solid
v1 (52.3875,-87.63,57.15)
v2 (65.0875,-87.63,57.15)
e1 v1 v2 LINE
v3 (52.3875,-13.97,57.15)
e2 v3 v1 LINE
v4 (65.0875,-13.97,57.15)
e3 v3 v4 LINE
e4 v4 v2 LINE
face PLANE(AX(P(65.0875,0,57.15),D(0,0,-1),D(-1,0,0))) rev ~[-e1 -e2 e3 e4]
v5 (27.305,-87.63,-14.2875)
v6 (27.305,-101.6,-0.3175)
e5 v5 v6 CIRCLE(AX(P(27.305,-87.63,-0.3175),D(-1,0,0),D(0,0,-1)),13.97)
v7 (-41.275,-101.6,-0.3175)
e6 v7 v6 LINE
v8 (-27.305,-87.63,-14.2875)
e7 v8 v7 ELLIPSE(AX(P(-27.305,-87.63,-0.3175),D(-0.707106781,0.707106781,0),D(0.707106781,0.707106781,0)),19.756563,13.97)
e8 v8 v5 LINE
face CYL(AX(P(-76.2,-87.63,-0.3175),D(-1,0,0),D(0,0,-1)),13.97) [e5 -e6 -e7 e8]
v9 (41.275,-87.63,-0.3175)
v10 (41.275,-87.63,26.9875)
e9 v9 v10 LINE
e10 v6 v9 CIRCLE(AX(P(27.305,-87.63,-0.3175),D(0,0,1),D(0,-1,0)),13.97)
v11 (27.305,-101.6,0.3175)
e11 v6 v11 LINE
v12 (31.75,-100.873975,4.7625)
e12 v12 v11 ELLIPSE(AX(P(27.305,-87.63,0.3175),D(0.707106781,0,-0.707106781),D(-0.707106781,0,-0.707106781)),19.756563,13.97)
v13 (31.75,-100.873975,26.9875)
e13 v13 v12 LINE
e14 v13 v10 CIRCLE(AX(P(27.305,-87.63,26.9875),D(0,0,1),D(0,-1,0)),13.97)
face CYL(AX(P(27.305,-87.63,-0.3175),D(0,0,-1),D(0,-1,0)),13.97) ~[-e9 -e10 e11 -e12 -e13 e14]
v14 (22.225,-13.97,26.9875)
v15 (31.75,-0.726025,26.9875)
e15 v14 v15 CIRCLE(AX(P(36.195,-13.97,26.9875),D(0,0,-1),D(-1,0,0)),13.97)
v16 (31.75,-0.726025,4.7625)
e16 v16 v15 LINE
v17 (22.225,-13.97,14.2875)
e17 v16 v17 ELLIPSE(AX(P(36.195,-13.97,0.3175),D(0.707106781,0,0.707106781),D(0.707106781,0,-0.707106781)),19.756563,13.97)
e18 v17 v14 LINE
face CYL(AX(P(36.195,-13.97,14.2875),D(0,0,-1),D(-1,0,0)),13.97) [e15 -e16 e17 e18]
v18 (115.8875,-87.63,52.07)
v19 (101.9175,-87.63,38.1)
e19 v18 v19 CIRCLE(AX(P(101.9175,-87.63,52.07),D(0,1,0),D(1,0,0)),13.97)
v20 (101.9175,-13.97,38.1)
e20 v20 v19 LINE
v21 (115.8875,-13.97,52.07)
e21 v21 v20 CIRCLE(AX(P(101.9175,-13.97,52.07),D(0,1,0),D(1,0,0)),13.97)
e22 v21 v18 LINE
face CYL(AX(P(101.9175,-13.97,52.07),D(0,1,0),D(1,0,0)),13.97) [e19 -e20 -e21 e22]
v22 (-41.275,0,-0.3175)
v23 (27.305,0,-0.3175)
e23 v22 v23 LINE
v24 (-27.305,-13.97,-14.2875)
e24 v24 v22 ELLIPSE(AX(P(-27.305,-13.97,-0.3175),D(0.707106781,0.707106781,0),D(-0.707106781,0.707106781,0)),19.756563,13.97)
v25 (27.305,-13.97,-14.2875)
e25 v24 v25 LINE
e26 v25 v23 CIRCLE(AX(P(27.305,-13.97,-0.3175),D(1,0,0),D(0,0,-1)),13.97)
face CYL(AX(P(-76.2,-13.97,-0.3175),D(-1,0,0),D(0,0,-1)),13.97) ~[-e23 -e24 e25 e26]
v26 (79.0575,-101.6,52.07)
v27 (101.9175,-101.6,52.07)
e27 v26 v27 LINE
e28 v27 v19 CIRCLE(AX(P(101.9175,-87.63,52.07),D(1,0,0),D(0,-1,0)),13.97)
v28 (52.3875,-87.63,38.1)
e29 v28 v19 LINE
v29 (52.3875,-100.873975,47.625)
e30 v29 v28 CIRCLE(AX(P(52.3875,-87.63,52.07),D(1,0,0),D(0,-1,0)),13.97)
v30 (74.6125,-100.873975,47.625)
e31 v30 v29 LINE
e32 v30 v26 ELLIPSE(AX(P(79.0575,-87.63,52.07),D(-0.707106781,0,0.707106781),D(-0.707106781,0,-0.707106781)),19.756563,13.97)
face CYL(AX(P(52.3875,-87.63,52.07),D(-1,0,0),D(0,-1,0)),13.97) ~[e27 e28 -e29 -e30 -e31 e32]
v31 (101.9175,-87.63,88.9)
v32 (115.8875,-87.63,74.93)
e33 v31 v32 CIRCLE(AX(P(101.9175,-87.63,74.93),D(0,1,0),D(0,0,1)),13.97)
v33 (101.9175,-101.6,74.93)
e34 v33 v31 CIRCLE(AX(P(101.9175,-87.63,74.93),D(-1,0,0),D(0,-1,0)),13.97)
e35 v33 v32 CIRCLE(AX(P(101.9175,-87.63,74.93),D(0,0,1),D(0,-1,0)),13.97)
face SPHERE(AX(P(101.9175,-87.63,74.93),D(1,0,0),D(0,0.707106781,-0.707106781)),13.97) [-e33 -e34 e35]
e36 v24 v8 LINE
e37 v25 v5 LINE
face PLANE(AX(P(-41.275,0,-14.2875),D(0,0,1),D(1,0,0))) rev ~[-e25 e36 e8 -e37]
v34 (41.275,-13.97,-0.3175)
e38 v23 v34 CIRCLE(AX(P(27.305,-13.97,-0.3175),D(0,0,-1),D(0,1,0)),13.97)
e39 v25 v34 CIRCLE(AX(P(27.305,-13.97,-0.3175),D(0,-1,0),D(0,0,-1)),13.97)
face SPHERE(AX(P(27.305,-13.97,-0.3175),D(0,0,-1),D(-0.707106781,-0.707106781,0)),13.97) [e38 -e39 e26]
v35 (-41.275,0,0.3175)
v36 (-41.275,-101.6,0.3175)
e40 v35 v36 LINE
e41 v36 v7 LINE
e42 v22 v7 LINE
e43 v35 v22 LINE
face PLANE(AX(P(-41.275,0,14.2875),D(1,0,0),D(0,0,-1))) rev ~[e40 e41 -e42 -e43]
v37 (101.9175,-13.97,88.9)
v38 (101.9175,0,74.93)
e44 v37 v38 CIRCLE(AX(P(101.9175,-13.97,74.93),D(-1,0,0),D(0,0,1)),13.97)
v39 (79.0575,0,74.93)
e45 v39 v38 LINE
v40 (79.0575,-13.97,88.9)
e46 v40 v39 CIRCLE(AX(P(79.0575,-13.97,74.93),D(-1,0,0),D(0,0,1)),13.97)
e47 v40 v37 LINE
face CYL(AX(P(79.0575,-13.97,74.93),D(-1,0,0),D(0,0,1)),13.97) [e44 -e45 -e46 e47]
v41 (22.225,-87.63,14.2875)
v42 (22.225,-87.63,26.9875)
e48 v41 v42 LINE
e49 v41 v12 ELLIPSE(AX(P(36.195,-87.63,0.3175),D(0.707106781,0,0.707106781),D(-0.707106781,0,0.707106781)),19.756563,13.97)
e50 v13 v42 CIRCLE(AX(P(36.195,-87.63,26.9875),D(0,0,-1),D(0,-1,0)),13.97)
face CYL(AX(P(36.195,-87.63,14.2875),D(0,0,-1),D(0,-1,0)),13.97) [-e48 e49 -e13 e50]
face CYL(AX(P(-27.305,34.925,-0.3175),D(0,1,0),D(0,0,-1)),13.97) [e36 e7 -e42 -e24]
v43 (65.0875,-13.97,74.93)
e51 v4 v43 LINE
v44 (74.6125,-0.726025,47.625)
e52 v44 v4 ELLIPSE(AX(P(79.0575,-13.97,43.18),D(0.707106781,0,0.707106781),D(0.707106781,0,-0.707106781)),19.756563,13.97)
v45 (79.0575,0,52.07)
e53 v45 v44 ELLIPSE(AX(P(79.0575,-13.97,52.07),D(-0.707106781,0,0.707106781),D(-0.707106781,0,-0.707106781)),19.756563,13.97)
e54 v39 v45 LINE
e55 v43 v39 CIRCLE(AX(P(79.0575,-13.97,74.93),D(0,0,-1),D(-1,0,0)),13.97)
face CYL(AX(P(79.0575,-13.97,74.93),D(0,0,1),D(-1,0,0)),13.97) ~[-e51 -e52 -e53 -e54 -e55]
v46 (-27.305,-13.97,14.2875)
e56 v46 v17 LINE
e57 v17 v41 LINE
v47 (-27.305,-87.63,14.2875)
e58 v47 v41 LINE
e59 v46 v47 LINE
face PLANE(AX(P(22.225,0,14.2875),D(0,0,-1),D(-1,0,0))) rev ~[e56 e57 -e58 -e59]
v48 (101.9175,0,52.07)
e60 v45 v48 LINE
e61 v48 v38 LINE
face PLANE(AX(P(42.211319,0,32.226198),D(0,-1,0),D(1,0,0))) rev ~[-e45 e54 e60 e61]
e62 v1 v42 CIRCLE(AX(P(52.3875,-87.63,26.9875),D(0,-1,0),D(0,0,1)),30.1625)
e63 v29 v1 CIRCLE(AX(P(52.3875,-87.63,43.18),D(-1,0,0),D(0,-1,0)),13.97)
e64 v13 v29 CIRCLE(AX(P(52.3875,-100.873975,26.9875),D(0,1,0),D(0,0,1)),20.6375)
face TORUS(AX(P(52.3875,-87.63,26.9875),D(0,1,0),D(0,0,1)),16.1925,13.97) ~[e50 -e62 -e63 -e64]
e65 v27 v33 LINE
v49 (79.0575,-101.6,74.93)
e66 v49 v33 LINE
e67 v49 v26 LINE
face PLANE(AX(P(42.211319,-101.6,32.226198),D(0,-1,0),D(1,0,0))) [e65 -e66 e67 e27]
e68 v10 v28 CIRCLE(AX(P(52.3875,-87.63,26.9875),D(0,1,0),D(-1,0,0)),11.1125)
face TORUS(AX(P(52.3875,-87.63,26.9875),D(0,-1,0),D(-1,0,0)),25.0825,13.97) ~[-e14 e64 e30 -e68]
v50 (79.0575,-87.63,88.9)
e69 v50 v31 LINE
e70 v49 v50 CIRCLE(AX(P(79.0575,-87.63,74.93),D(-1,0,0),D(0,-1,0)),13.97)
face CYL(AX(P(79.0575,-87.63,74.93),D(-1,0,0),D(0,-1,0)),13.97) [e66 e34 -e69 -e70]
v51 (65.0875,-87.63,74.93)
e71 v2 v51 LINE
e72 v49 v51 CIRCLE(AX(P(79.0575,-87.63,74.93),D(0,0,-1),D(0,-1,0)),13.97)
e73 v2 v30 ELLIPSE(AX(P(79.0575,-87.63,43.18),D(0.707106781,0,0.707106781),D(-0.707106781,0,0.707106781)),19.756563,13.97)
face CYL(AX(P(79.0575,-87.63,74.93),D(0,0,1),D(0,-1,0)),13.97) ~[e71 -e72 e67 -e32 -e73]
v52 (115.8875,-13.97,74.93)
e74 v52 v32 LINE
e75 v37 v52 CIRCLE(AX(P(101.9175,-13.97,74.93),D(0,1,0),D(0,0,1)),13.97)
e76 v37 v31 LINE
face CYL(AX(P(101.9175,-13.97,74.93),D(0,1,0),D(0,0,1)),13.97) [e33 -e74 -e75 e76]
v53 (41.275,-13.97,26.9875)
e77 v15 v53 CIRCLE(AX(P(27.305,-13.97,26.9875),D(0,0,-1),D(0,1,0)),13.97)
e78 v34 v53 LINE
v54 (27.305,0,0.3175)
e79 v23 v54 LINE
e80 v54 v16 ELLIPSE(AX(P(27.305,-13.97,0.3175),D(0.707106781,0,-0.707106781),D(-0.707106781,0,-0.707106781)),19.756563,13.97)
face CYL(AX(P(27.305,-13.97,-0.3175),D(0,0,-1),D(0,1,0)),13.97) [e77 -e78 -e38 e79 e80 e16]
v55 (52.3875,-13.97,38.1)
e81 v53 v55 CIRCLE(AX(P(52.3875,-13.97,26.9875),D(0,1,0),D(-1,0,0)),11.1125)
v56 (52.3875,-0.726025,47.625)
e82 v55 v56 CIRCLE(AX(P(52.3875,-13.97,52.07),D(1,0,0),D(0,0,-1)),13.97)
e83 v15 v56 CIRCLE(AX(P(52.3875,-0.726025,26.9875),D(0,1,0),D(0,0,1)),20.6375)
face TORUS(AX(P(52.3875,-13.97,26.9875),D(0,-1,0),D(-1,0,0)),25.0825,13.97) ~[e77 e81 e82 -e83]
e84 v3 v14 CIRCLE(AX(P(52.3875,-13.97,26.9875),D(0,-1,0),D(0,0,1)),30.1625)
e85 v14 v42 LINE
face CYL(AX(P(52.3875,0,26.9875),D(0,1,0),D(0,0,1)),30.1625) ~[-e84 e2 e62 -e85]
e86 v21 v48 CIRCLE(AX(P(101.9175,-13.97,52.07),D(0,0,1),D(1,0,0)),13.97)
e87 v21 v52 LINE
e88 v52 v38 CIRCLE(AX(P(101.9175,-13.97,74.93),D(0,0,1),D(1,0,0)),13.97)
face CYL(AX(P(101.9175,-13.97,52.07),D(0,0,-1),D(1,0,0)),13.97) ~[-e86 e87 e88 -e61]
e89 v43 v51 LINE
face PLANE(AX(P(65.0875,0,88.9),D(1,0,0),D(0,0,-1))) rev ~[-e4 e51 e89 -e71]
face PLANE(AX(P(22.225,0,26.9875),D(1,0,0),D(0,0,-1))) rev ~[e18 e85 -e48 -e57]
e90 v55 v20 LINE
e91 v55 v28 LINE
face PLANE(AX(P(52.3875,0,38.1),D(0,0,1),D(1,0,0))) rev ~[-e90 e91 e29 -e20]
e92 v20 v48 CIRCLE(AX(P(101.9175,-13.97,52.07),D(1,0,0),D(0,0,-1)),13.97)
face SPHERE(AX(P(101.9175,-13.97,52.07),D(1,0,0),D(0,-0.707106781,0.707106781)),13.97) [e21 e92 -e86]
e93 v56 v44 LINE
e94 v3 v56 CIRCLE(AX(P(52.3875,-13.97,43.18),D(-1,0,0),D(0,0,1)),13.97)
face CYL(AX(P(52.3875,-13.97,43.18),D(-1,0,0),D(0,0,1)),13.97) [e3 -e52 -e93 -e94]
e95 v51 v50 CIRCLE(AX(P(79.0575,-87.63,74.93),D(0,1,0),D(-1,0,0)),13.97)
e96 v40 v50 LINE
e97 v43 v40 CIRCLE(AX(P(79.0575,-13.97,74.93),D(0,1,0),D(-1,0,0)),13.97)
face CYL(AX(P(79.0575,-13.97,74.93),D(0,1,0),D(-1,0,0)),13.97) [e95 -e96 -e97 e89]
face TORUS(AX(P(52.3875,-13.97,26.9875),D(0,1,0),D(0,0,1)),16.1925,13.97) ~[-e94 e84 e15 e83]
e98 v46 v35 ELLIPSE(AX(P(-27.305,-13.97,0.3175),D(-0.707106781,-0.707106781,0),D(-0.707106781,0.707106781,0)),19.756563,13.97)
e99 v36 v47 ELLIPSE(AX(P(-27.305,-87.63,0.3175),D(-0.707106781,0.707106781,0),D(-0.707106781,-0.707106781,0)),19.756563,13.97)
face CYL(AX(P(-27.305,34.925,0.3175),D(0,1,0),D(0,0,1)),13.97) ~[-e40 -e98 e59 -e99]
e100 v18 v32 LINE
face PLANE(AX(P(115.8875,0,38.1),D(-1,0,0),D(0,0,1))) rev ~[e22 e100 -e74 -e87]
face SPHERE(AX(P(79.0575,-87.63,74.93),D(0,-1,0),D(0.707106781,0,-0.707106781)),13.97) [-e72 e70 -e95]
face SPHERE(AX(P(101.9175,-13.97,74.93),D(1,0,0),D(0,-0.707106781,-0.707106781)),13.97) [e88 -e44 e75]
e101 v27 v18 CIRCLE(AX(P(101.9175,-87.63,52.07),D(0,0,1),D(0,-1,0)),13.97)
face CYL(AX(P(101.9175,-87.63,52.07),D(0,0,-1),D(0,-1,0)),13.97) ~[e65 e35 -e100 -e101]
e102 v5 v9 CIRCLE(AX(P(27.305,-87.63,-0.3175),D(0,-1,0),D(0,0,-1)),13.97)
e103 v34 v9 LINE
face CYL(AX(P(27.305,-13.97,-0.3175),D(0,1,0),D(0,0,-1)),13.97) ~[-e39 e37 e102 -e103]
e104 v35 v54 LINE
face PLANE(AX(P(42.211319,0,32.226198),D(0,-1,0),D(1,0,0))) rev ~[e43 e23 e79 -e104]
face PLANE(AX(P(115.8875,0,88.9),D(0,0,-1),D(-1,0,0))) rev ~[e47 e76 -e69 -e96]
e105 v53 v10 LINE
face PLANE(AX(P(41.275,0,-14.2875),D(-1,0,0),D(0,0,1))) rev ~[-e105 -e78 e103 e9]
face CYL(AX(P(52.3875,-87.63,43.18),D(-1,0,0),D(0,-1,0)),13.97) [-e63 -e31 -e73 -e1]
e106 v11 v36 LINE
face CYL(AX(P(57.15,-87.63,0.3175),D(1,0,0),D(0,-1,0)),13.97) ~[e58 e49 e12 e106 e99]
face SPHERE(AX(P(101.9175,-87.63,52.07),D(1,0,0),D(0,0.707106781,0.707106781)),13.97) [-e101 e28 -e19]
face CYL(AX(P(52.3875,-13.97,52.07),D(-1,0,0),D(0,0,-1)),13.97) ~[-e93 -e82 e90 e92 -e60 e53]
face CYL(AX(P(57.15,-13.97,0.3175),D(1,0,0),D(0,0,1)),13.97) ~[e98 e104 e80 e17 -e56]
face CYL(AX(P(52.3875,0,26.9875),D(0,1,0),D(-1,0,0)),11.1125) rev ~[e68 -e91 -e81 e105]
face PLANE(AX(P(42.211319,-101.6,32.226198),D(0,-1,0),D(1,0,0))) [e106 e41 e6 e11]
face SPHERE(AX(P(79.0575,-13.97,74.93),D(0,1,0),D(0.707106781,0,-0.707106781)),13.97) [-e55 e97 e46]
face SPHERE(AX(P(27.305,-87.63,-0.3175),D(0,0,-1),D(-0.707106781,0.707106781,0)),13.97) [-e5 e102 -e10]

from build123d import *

# Parameters (mm, degrees)
F1_DEPTH      = 101.6
F2_T1_DEPTH   = 22.86
F2_T3_DEPTH   = 17.78
F2_T5_DEPTH   = 73.66
F2_T7_DEPTH   = 22.86
F2_T9_DEPTH   = 49.53
F2_T11_DEPTH  = 12.7
F2_T13_DEPTH  = 98.425
F2_T15_DEPTH  = 171.45
F2_T17_DEPTH  = 103.505
F2_T19_DEPTH  = 12.7
F2_T21_DEPTH  = 27.305
F2_S25_W      = 13.97
F2_S25_H      = 13.97
F2_T26_DEPTH  = 13.97
F2_S31_W      = 13.97
F2_S31_H      = 13.97
F2_T32_DEPTH  = 13.97
F2_S37_W      = 13.97
F2_S37_H      = 13.97
F2_T38_DEPTH  = 13.97
F2_S43_W      = 13.97
F2_S43_H      = 13.97
F2_T44_DEPTH  = 13.97
F2_S49_W      = 13.97
F2_S49_H      = 13.97
F2_T50_DEPTH  = 13.97
F2_S55_W      = 13.97
F2_S55_H      = 13.97
F2_T56_DEPTH  = 13.97
F2_S61_W      = 13.97
F2_S61_H      = 13.97
F2_T62_DEPTH  = 13.97
F2_S67_W      = 13.97
F2_S67_H      = 13.97
F2_T68_DEPTH  = 13.97
F2_T72_ANGLE  = 90
F2_T74_ANGLE  = 90
F2_T76_ANGLE  = 90
F2_T78_ANGLE  = 90
F2_T83_DEPTH  = 52.705
F2_T87_DEPTH  = 47.625
F2_T94_DEPTH  = 47.625
F2_T98_DEPTH  = 52.705
F2_T105_DEPTH = 47.625
F2_T109_DEPTH = 133.35
F2_T116_DEPTH = 133.35
F2_T120_DEPTH = 47.625


# Not quite as in the source:
# - a fillet or chamfer that OpenCascade refuses, or shapes differently, is made with other operations: its cross-section is extruded or revolved along the edge and cut away or added


with BuildPart() as f1:
    # F0 (on Front) → F1 (new body)
    with BuildSketch(Plane.XZ):
        with BuildLine():
            Line((-41.275, -14.2875), (41.275, -14.2875))
            Line((41.275, -14.2875), (41.275, 14.2875))
            Line((41.275, 14.2875), (41.275, 26.9875))
            ThreePointArc((41.275, 26.9875), (44.5297758941, 34.8452241059), (52.3875, 38.1))
            Line((52.3875, 38.1), (65.0875, 38.1))
            Line((65.0875, 38.1), (115.8875, 38.1))
            Line((115.8875, 38.1), (115.8875, 88.9))
            Line((115.8875, 88.9), (65.0875, 88.9))
            Line((65.0875, 88.9), (65.0875, 57.15))
            Line((65.0875, 57.15), (52.3875, 57.15))
            ThreePointArc((52.3875, 57.15), (31.0593917125, 48.3156082875), (22.225, 26.9875))
            Line((22.225, 26.9875), (22.225, 14.2875))
            Line((22.225, 14.2875), (-41.275, 14.2875))
            Line((-41.275, 14.2875), (-41.275, -14.2875))
        make_face()
    extrude(amount=F1_DEPTH)

    # F2: fillet of radius 13.97 on 20 edges, made by hand

    # F2_s2 → F2_t1 (cut)
    with BuildSketch(Plane.YZ.offset(79.0575)):
        with BuildLine():
            ThreePointArc((-101.6, 74.93), (-97.5082817332, 84.8082817332), (-87.63, 88.9))
            Line((-87.63, 88.9), (-101.6, 88.9))
            Line((-101.6, 88.9), (-101.6, 74.93))
        make_face()
        with BuildLine():
            ThreePointArc((-13.97, 88.9), (-4.0917182668, 84.8082817332), (0, 74.93))
            Line((0, 74.93), (0, 88.9))
            Line((0, 88.9), (-13.97, 88.9))
        make_face()
    extrude(amount=F2_T1_DEPTH, mode=Mode.SUBTRACT)

    # F2_s4 → F2_t3 (cut)
    with BuildSketch(Plane.XY.offset(57.15)):
        with BuildLine():
            ThreePointArc((79.0575, -101.6), (69.1792182668, -97.5082817332), (65.0875, -87.63))
            Line((65.0875, -87.63), (65.0875, -101.6))
            Line((65.0875, -101.6), (79.0575, -101.6))
        make_face()
        with BuildLine():
            ThreePointArc((65.0875, -13.97), (69.1792182668, -4.0917182668), (79.0575, 0))
            Line((79.0575, 0), (65.0875, 0))
            Line((65.0875, 0), (65.0875, -13.97))
        make_face()
    extrude(amount=F2_T3_DEPTH, mode=Mode.SUBTRACT)

    # F2_s6 → F2_t5 (cut)
    with BuildSketch(Plane.XZ.offset(13.97)):
        with BuildLine():
            ThreePointArc((101.9175, 88.9), (111.7957817332, 84.8082817332), (115.8875, 74.93))
            Line((115.8875, 74.93), (115.8875, 88.9))
            Line((115.8875, 88.9), (101.9175, 88.9))
        make_face()
        with BuildLine():
            ThreePointArc((65.0875, 74.93), (69.1792182668, 84.8082817332), (79.0575, 88.9))
            Line((79.0575, 88.9), (65.0875, 88.9))
            Line((65.0875, 88.9), (65.0875, 74.93))
        make_face()
        with BuildLine():
            ThreePointArc((115.8875, 52.07), (111.7957817332, 42.1917182668), (101.9175, 38.1))
            Line((101.9175, 38.1), (115.8875, 38.1))
            Line((115.8875, 38.1), (115.8875, 52.07))
        make_face()
        with BuildLine():
            ThreePointArc((27.305, -14.2875), (37.1832817332, -10.1957817332), (41.275, -0.3175))
            Line((41.275, -0.3175), (41.275, -14.2875))
            Line((41.275, -14.2875), (27.305, -14.2875))
        make_face()
    extrude(amount=F2_T5_DEPTH, mode=Mode.SUBTRACT)

    # F2_s8 → F2_t7 (cut)
    with BuildSketch(Plane.XY.offset(52.07)):
        with BuildLine():
            ThreePointArc((101.9175, -101.6), (111.7957817332, -97.5082817332), (115.8875, -87.63))
            Line((115.8875, -87.63), (115.8875, -101.6))
            Line((115.8875, -101.6), (101.9175, -101.6))
        make_face()
        with BuildLine():
            ThreePointArc((115.8875, -13.97), (111.7957817332, -4.0917182668), (101.9175, 0))
            Line((101.9175, 0), (115.8875, 0))
            Line((115.8875, 0), (115.8875, -13.97))
        make_face()
    extrude(amount=F2_T7_DEPTH, mode=Mode.SUBTRACT)

    # F2_s10 → F2_t9 (cut)
    with BuildSketch(Plane.YZ.offset(52.3875)):
        with BuildLine():
            ThreePointArc((-101.6, 52.07), (-97.5082817332, 42.1917182668), (-87.63, 38.1))
            Line((-87.63, 38.1), (-101.6, 38.1))
            Line((-101.6, 38.1), (-101.6, 52.07))
        make_face()
        with BuildLine():
            ThreePointArc((-13.97, 38.1), (-4.0917182668, 42.1917182668), (0, 52.07))
            Line((0, 52.07), (0, 38.1))
            Line((0, 38.1), (-13.97, 38.1))
        make_face()
    extrude(amount=F2_T9_DEPTH, mode=Mode.SUBTRACT)

    # F2_s12 → F2_t11 (cut)
    with BuildSketch(Plane.XY.offset(14.2875)):
        with BuildLine():
            ThreePointArc((36.195, -101.6), (26.3167182668, -97.5082817332), (22.225, -87.63))
            Line((22.225, -87.63), (22.225, -101.6))
            Line((22.225, -101.6), (36.195, -101.6))
        make_face()
        with BuildLine():
            ThreePointArc((22.225, -13.97), (26.3167182668, -4.0917182668), (36.195, 0))
            Line((36.195, 0), (22.225, 0))
            Line((22.225, 0), (22.225, -13.97))
        make_face()
    extrude(amount=F2_T11_DEPTH, mode=Mode.SUBTRACT)

    # F2_s14 → F2_t13 (cut)
    with BuildSketch(Plane.YZ.offset(-76.2)):
        with BuildLine():
            ThreePointArc((-101.6, 0.3175), (-97.5082817332, 10.1957817332), (-87.63, 14.2875))
            Line((-87.63, 14.2875), (-101.6, 14.2875))
            Line((-101.6, 14.2875), (-101.6, 0.3175))
        make_face()
        with BuildLine():
            ThreePointArc((-13.97, 14.2875), (-4.0917182668, 10.1957817332), (0, 0.3175))
            Line((0, 0.3175), (0, 14.2875))
            Line((0, 14.2875), (-13.97, 14.2875))
        make_face()
    extrude(amount=F2_T13_DEPTH, mode=Mode.SUBTRACT)

    # F2_s16 → F2_t15 (cut)
    with BuildSketch(Plane.XZ.offset(-34.925)):
        with BuildLine():
            ThreePointArc((-27.305, 14.2875), (-37.1832817332, 10.1957817332), (-41.275, 0.3175))
            Line((-41.275, 0.3175), (-41.275, 14.2875))
            Line((-41.275, 14.2875), (-27.305, 14.2875))
        make_face()
        with BuildLine():
            ThreePointArc((-27.305, -14.2875), (-37.1832817332, -10.1957817332), (-41.275, -0.3175))
            Line((-41.275, -0.3175), (-41.275, -14.2875))
            Line((-41.275, -14.2875), (-27.305, -14.2875))
        make_face()
    extrude(amount=F2_T15_DEPTH, mode=Mode.SUBTRACT)

    # F2_s18 → F2_t17 (cut)
    with BuildSketch(Plane.YZ.offset(-76.2)):
        with BuildLine():
            ThreePointArc((-13.97, -14.2875), (-4.0917182668, -10.1957817332), (0, -0.3175))
            Line((0, -0.3175), (0, -14.2875))
            Line((0, -14.2875), (-13.97, -14.2875))
        make_face()
        with BuildLine():
            ThreePointArc((-87.63, -14.2875), (-97.5082817332, -10.1957817332), (-101.6, -0.3175))
            Line((-101.6, -0.3175), (-101.6, -14.2875))
            Line((-101.6, -14.2875), (-87.63, -14.2875))
        make_face()
    extrude(amount=F2_T17_DEPTH, mode=Mode.SUBTRACT)

    # F2_s20 → F2_t19 (cut)
    with BuildSketch(Plane.YZ.offset(52.3875)):
        with BuildLine():
            ThreePointArc((-13.97, 57.15), (-4.0917182668, 53.0582817332), (0, 43.18))
            Line((0, 43.18), (0, 57.15))
            Line((0, 57.15), (-13.97, 57.15))
        make_face()
        with BuildLine():
            ThreePointArc((-101.6, 43.18), (-97.5082817332, 53.0582817332), (-87.63, 57.15))
            Line((-87.63, 57.15), (-101.6, 57.15))
            Line((-101.6, 57.15), (-101.6, 43.18))
        make_face()
    extrude(amount=F2_T19_DEPTH, mode=Mode.SUBTRACT)

    # F2_s22 → F2_t21 (cut)
    with BuildSketch(Plane.XY.offset(-0.3175)):
        with BuildLine():
            ThreePointArc((27.305, 0), (37.1832817332, -4.0917182668), (41.275, -13.97))
            Line((41.275, -13.97), (41.275, 0))
            Line((41.275, 0), (27.305, 0))
        make_face()
        with BuildLine():
            ThreePointArc((27.305, -101.6), (37.1832817332, -97.5082817332), (41.275, -87.63))
            Line((41.275, -87.63), (41.275, -101.6))
            Line((41.275, -101.6), (27.305, -101.6))
        make_face()
    extrude(amount=F2_T21_DEPTH, mode=Mode.SUBTRACT)


with BuildPart() as f2_tool24:
    # F2_s25 → F2_t26 (new body)
    with BuildSketch(Plane.YZ.offset(101.9175)):
        with Locations((-94.615, 81.915)):
            Rectangle(F2_S25_W, F2_S25_H)
    extrude(amount=F2_T26_DEPTH)

    # F2_s27 → F2_t28 (revolve, cut)
    with BuildSketch(Plane(origin=(101.9175, -87.63, 74.93), x_dir=(0, 0.7071067812, -0.7071067812), z_dir=(0, -0.7071067812, -0.7071067812))):
        with BuildLine():
            ThreePointArc((0, -13.97), (13.97, 0), (0, 13.97))
            Line((0, 13.97), (0, -13.97))
        make_face()
    revolve(axis=Axis((101.9175, -87.63, 74.93), (1, 0, 0)), mode=Mode.SUBTRACT)


with BuildPart() as f1_1:
    add(f1.part)

    # F2_t23: cut F2_tool24
    add(f2_tool24.part, mode=Mode.SUBTRACT)


with BuildPart() as f2_tool30:
    # F2_s31 → F2_t32 (new body)
    with BuildSketch(Plane.XZ.offset(87.63)):
        with Locations((72.0725, 81.915)):
            Rectangle(F2_S31_W, F2_S31_H)
    extrude(amount=F2_T32_DEPTH)

    # F2_s33 → F2_t34 (revolve, cut)
    with BuildSketch(Plane(origin=(79.0575, -87.63, 74.93), x_dir=(0.7071067812, 0, -0.7071067812), z_dir=(-0.7071067812, 0, -0.7071067812))):
        with BuildLine():
            ThreePointArc((0, -13.97), (13.97, 0), (0, 13.97))
            Line((0, 13.97), (0, -13.97))
        make_face()
    revolve(axis=Axis((79.0575, -87.63, 74.93), (0, -1, 0)), mode=Mode.SUBTRACT)


with BuildPart() as f1_2:
    add(f1_1.part)

    # F2_t29: cut F2_tool30
    add(f2_tool30.part, mode=Mode.SUBTRACT)


with BuildPart() as f2_tool36:
    # F2_s37 → F2_t38 (new body)
    with BuildSketch(Plane.YZ.offset(101.9175)):
        with Locations((-6.985, 81.915)):
            Rectangle(F2_S37_W, F2_S37_H)
    extrude(amount=F2_T38_DEPTH)

    # F2_s39 → F2_t40 (revolve, cut)
    with BuildSketch(Plane(origin=(101.9175, -13.97, 74.93), x_dir=(0, -0.7071067812, -0.7071067812), z_dir=(0, -0.7071067812, 0.7071067812))):
        with BuildLine():
            ThreePointArc((0, -13.97), (13.97, 0), (0, 13.97))
            Line((0, 13.97), (0, -13.97))
        make_face()
    revolve(axis=Axis((101.9175, -13.97, 74.93), (1, 0, 0)), mode=Mode.SUBTRACT)


with BuildPart() as f1_3:
    add(f1_2.part)

    # F2_t35: cut F2_tool36
    add(f2_tool36.part, mode=Mode.SUBTRACT)


with BuildPart() as f2_tool42:
    # F2_s43 → F2_t44 (new body)
    with BuildSketch(Plane.XZ.offset(13.97)):
        with Locations((72.0725, 81.915)):
            Rectangle(F2_S43_W, F2_S43_H)
    extrude(amount=-F2_T44_DEPTH)

    # F2_s45 → F2_t46 (revolve, cut)
    with BuildSketch(Plane(origin=(79.0575, -13.97, 74.93), x_dir=(0.7071067812, 0, -0.7071067812), z_dir=(0.7071067812, 0, 0.7071067812))):
        with BuildLine():
            ThreePointArc((0, -13.97), (13.97, 0), (0, 13.97))
            Line((0, 13.97), (0, -13.97))
        make_face()
    revolve(axis=Axis((79.0575, -13.97, 74.93), (0, 1, 0)), mode=Mode.SUBTRACT)


with BuildPart() as f1_4:
    add(f1_3.part)

    # F2_t41: cut F2_tool42
    add(f2_tool42.part, mode=Mode.SUBTRACT)


with BuildPart() as f2_tool48:
    # F2_s49 → F2_t50 (new body)
    with BuildSketch(Plane.YZ.offset(101.9175)):
        with Locations((-94.615, 45.085)):
            Rectangle(F2_S49_W, F2_S49_H)
    extrude(amount=F2_T50_DEPTH)

    # F2_s51 → F2_t52 (revolve, cut)
    with BuildSketch(Plane(origin=(101.9175, -87.63, 52.07), x_dir=(0, 0.7071067812, 0.7071067812), z_dir=(0, 0.7071067812, -0.7071067812))):
        with BuildLine():
            ThreePointArc((0, -13.97), (13.97, 0), (0, 13.97))
            Line((0, 13.97), (0, -13.97))
        make_face()
    revolve(axis=Axis((101.9175, -87.63, 52.07), (1, 0, 0)), mode=Mode.SUBTRACT)


with BuildPart() as f1_5:
    add(f1_4.part)

    # F2_t47: cut F2_tool48
    add(f2_tool48.part, mode=Mode.SUBTRACT)


with BuildPart() as f2_tool54:
    # F2_s55 → F2_t56 (new body)
    with BuildSketch(Plane.YZ.offset(101.9175)):
        with Locations((-6.985, 45.085)):
            Rectangle(F2_S55_W, F2_S55_H)
    extrude(amount=F2_T56_DEPTH)

    # F2_s57 → F2_t58 (revolve, cut)
    with BuildSketch(Plane(origin=(101.9175, -13.97, 52.07), x_dir=(0, -0.7071067812, 0.7071067812), z_dir=(0, 0.7071067812, 0.7071067812))):
        with BuildLine():
            ThreePointArc((0, -13.97), (13.97, 0), (0, 13.97))
            Line((0, 13.97), (0, -13.97))
        make_face()
    revolve(axis=Axis((101.9175, -13.97, 52.07), (1, 0, 0)), mode=Mode.SUBTRACT)


with BuildPart() as f1_6:
    add(f1_5.part)

    # F2_t53: cut F2_tool54
    add(f2_tool54.part, mode=Mode.SUBTRACT)


with BuildPart() as f2_tool60:
    # F2_s61 → F2_t62 (new body)
    with BuildSketch(Plane.XY.offset(-0.3175)):
        with Locations((34.29, -6.985)):
            Rectangle(F2_S61_W, F2_S61_H)
    extrude(amount=-F2_T62_DEPTH)

    # F2_s63 → F2_t64 (revolve, cut)
    with BuildSketch(Plane(origin=(27.305, -13.97, -0.3175), x_dir=(-0.7071067812, -0.7071067812, 0), z_dir=(0.7071067812, -0.7071067812, 0))):
        with BuildLine():
            ThreePointArc((0, -13.97), (13.97, 0), (0, 13.97))
            Line((0, 13.97), (0, -13.97))
        make_face()
    revolve(axis=Axis((27.305, -13.97, -0.3175), (0, 0, -1)), mode=Mode.SUBTRACT)


with BuildPart() as f1_7:
    add(f1_6.part)

    # F2_t59: cut F2_tool60
    add(f2_tool60.part, mode=Mode.SUBTRACT)


with BuildPart() as f2_tool66:
    # F2_s67 → F2_t68 (new body)
    with BuildSketch(Plane.XY.offset(-0.3175)):
        with Locations((34.29, -94.615)):
            Rectangle(F2_S67_W, F2_S67_H)
    extrude(amount=-F2_T68_DEPTH)

    # F2_s69 → F2_t70 (revolve, cut)
    with BuildSketch(Plane(origin=(27.305, -87.63, -0.3175), x_dir=(-0.7071067812, 0.7071067812, 0), z_dir=(-0.7071067812, -0.7071067812, 0))):
        with BuildLine():
            ThreePointArc((0, -13.97), (13.97, 0), (0, 13.97))
            Line((0, 13.97), (0, -13.97))
        make_face()
    revolve(axis=Axis((27.305, -87.63, -0.3175), (0, 0, -1)), mode=Mode.SUBTRACT)


with BuildPart() as f1_8:
    add(f1_7.part)

    # F2_t65: cut F2_tool66
    add(f2_tool66.part, mode=Mode.SUBTRACT)

    # F2_s71 → F2_t72 (revolve, cut)
    with BuildSketch(Plane.YZ.offset(52.3875)):
        with BuildLine():
            ThreePointArc((-13.97, 57.15), (-4.0917182668, 53.0582817332), (0, 43.18))
            Line((0, 43.18), (0, 57.15))
            Line((0, 57.15), (-13.97, 57.15))
        make_face()
    revolve(axis=Axis((52.3875, 0, 26.9875), (0, -1, 0)), revolution_arc=F2_T72_ANGLE, mode=Mode.SUBTRACT)

    # F2_s73 → F2_t74 (revolve, cut)
    with BuildSketch(Plane.YZ.offset(52.3875)):
        with BuildLine():
            ThreePointArc((-101.6, 43.18), (-97.5082817332, 53.0582817332), (-87.63, 57.15))
            Line((-87.63, 57.15), (-101.6, 57.15))
            Line((-101.6, 57.15), (-101.6, 43.18))
        make_face()
    revolve(axis=Axis((52.3875, -101.6, 26.9875), (0, -1, 0)), revolution_arc=F2_T74_ANGLE, mode=Mode.SUBTRACT)

    # F2_s75 → F2_t76 (revolve, cut)
    with BuildSketch(Plane.XY.offset(26.9875)):
        with BuildLine():
            ThreePointArc((41.275, -13.97), (37.1832817332, -4.0917182668), (27.305, 0))
            Line((27.305, 0), (41.275, 0))
            Line((41.275, 0), (41.275, -13.97))
        make_face()
    revolve(axis=Axis((52.3875, 0, 26.9875), (0, 1, 0)), revolution_arc=F2_T76_ANGLE, mode=Mode.SUBTRACT)

    # F2_s77 → F2_t78 (revolve, cut)
    with BuildSketch(Plane.XY.offset(26.9875)):
        with BuildLine():
            ThreePointArc((27.305, -101.6), (37.1832817332, -97.5082817332), (41.275, -87.63))
            Line((41.275, -87.63), (41.275, -101.6))
            Line((41.275, -101.6), (27.305, -101.6))
        make_face()
    revolve(axis=Axis((52.3875, -101.6, 26.9875), (0, 1, 0)), revolution_arc=F2_T78_ANGLE, mode=Mode.SUBTRACT)


with BuildPart() as f2_tool81:
    # F2_s82 → F2_t83 (new body)
    with BuildSketch(Plane.XY.offset(74.93)):
        with BuildLine():
            ThreePointArc((79.0575, -101.6), (69.1792182668, -97.5082817332), (65.0875, -87.63))
            Line((65.0875, -87.63), (65.0875, -101.6))
            Line((65.0875, -101.6), (79.0575, -101.6))
        make_face()
    extrude(amount=-F2_T83_DEPTH)

    split(bisect_by=Plane.XY.offset(57.15), keep=Keep.BOTTOM)


with BuildPart() as f2_tool85:
    # F2_s86 → F2_t87 (new body)
    with BuildSketch(Plane.YZ.offset(100.0125)):
        with BuildLine():
            ThreePointArc((-101.6, 43.18), (-97.5082817332, 53.0582817332), (-87.63, 57.15))
            Line((-87.63, 57.15), (-101.6, 57.15))
            Line((-101.6, 57.15), (-101.6, 43.18))
        make_face()
    extrude(amount=-F2_T87_DEPTH)

    split(bisect_by=Plane.YZ.offset(65.0875), keep=Keep.TOP)


with BuildPart() as f2_tool81_1:
    add(f2_tool81.part)

    # F2_t89: intersect F2_tool85
    add(f2_tool85.part, mode=Mode.INTERSECT)


with BuildPart() as f1_9:
    add(f1_8.part)

    # F2_t79: cut F2_tool81
    add(f2_tool81_1.part, mode=Mode.SUBTRACT)


with BuildPart() as f2_tool92:
    # F2_s93 → F2_t94 (new body)
    with BuildSketch(Plane.YZ.offset(100.0125)):
        with BuildLine():
            ThreePointArc((-13.97, 57.15), (-4.0917182668, 53.0582817332), (0, 43.18))
            Line((0, 43.18), (0, 57.15))
            Line((0, 57.15), (-13.97, 57.15))
        make_face()
    extrude(amount=-F2_T94_DEPTH)

    split(bisect_by=Plane.YZ.offset(65.0875), keep=Keep.TOP)


with BuildPart() as f2_tool96:
    # F2_s97 → F2_t98 (new body)
    with BuildSketch(Plane.XY.offset(74.93)):
        with BuildLine():
            ThreePointArc((65.0875, -13.97), (69.1792182668, -4.0917182668), (79.0575, 0))
            Line((79.0575, 0), (65.0875, 0))
            Line((65.0875, 0), (65.0875, -13.97))
        make_face()
    extrude(amount=-F2_T98_DEPTH)

    split(bisect_by=Plane.XY.offset(57.15), keep=Keep.BOTTOM)


with BuildPart() as f2_tool92_1:
    add(f2_tool92.part)

    # F2_t100: intersect F2_tool96
    add(f2_tool96.part, mode=Mode.INTERSECT)


with BuildPart() as f1_10:
    add(f1_9.part)

    # F2_t90: cut F2_tool92
    add(f2_tool92_1.part, mode=Mode.SUBTRACT)


with BuildPart() as f2_tool103:
    # F2_s104 → F2_t105 (new body)
    with BuildSketch(Plane.XY.offset(26.9875)):
        with BuildLine():
            ThreePointArc((36.195, -101.6), (26.3167182668, -97.5082817332), (22.225, -87.63))
            Line((22.225, -87.63), (22.225, -101.6))
            Line((22.225, -101.6), (36.195, -101.6))
        make_face()
    extrude(amount=-F2_T105_DEPTH)

    split(bisect_by=Plane.XY.offset(14.2875), keep=Keep.BOTTOM)


with BuildPart() as f2_tool107:
    # F2_s108 → F2_t109 (new body)
    with BuildSketch(Plane.YZ.offset(57.15)):
        with BuildLine():
            ThreePointArc((-101.6, 0.3175), (-97.5082817332, 10.1957817332), (-87.63, 14.2875))
            Line((-87.63, 14.2875), (-101.6, 14.2875))
            Line((-101.6, 14.2875), (-101.6, 0.3175))
        make_face()
    extrude(amount=-F2_T109_DEPTH)

    split(bisect_by=Plane.YZ.offset(22.225), keep=Keep.TOP)


with BuildPart() as f2_tool103_1:
    add(f2_tool103.part)

    # F2_t111: intersect F2_tool107
    add(f2_tool107.part, mode=Mode.INTERSECT)


with BuildPart() as f1_11:
    add(f1_10.part)

    # F2_t101: cut F2_tool103
    add(f2_tool103_1.part, mode=Mode.SUBTRACT)


with BuildPart() as f2_tool114:
    # F2_s115 → F2_t116 (new body)
    with BuildSketch(Plane.YZ.offset(57.15)):
        with BuildLine():
            ThreePointArc((-13.97, 14.2875), (-4.0917182668, 10.1957817332), (0, 0.3175))
            Line((0, 0.3175), (0, 14.2875))
            Line((0, 14.2875), (-13.97, 14.2875))
        make_face()
    extrude(amount=-F2_T116_DEPTH)

    split(bisect_by=Plane.YZ.offset(22.225), keep=Keep.TOP)


with BuildPart() as f2_tool118:
    # F2_s119 → F2_t120 (new body)
    with BuildSketch(Plane.XY.offset(26.9875)):
        with BuildLine():
            ThreePointArc((22.225, -13.97), (26.3167182668, -4.0917182668), (36.195, 0))
            Line((36.195, 0), (22.225, 0))
            Line((22.225, 0), (22.225, -13.97))
        make_face()
    extrude(amount=-F2_T120_DEPTH)

    split(bisect_by=Plane.XY.offset(14.2875), keep=Keep.BOTTOM)


with BuildPart() as f2_tool114_1:
    add(f2_tool114.part)

    # F2_t122: intersect F2_tool118
    add(f2_tool118.part, mode=Mode.INTERSECT)


with BuildPart() as f1_12:
    add(f1_11.part)

    # F2_t112: cut F2_tool114
    add(f2_tool114_1.part, mode=Mode.SUBTRACT)


solid = f1_12.part
